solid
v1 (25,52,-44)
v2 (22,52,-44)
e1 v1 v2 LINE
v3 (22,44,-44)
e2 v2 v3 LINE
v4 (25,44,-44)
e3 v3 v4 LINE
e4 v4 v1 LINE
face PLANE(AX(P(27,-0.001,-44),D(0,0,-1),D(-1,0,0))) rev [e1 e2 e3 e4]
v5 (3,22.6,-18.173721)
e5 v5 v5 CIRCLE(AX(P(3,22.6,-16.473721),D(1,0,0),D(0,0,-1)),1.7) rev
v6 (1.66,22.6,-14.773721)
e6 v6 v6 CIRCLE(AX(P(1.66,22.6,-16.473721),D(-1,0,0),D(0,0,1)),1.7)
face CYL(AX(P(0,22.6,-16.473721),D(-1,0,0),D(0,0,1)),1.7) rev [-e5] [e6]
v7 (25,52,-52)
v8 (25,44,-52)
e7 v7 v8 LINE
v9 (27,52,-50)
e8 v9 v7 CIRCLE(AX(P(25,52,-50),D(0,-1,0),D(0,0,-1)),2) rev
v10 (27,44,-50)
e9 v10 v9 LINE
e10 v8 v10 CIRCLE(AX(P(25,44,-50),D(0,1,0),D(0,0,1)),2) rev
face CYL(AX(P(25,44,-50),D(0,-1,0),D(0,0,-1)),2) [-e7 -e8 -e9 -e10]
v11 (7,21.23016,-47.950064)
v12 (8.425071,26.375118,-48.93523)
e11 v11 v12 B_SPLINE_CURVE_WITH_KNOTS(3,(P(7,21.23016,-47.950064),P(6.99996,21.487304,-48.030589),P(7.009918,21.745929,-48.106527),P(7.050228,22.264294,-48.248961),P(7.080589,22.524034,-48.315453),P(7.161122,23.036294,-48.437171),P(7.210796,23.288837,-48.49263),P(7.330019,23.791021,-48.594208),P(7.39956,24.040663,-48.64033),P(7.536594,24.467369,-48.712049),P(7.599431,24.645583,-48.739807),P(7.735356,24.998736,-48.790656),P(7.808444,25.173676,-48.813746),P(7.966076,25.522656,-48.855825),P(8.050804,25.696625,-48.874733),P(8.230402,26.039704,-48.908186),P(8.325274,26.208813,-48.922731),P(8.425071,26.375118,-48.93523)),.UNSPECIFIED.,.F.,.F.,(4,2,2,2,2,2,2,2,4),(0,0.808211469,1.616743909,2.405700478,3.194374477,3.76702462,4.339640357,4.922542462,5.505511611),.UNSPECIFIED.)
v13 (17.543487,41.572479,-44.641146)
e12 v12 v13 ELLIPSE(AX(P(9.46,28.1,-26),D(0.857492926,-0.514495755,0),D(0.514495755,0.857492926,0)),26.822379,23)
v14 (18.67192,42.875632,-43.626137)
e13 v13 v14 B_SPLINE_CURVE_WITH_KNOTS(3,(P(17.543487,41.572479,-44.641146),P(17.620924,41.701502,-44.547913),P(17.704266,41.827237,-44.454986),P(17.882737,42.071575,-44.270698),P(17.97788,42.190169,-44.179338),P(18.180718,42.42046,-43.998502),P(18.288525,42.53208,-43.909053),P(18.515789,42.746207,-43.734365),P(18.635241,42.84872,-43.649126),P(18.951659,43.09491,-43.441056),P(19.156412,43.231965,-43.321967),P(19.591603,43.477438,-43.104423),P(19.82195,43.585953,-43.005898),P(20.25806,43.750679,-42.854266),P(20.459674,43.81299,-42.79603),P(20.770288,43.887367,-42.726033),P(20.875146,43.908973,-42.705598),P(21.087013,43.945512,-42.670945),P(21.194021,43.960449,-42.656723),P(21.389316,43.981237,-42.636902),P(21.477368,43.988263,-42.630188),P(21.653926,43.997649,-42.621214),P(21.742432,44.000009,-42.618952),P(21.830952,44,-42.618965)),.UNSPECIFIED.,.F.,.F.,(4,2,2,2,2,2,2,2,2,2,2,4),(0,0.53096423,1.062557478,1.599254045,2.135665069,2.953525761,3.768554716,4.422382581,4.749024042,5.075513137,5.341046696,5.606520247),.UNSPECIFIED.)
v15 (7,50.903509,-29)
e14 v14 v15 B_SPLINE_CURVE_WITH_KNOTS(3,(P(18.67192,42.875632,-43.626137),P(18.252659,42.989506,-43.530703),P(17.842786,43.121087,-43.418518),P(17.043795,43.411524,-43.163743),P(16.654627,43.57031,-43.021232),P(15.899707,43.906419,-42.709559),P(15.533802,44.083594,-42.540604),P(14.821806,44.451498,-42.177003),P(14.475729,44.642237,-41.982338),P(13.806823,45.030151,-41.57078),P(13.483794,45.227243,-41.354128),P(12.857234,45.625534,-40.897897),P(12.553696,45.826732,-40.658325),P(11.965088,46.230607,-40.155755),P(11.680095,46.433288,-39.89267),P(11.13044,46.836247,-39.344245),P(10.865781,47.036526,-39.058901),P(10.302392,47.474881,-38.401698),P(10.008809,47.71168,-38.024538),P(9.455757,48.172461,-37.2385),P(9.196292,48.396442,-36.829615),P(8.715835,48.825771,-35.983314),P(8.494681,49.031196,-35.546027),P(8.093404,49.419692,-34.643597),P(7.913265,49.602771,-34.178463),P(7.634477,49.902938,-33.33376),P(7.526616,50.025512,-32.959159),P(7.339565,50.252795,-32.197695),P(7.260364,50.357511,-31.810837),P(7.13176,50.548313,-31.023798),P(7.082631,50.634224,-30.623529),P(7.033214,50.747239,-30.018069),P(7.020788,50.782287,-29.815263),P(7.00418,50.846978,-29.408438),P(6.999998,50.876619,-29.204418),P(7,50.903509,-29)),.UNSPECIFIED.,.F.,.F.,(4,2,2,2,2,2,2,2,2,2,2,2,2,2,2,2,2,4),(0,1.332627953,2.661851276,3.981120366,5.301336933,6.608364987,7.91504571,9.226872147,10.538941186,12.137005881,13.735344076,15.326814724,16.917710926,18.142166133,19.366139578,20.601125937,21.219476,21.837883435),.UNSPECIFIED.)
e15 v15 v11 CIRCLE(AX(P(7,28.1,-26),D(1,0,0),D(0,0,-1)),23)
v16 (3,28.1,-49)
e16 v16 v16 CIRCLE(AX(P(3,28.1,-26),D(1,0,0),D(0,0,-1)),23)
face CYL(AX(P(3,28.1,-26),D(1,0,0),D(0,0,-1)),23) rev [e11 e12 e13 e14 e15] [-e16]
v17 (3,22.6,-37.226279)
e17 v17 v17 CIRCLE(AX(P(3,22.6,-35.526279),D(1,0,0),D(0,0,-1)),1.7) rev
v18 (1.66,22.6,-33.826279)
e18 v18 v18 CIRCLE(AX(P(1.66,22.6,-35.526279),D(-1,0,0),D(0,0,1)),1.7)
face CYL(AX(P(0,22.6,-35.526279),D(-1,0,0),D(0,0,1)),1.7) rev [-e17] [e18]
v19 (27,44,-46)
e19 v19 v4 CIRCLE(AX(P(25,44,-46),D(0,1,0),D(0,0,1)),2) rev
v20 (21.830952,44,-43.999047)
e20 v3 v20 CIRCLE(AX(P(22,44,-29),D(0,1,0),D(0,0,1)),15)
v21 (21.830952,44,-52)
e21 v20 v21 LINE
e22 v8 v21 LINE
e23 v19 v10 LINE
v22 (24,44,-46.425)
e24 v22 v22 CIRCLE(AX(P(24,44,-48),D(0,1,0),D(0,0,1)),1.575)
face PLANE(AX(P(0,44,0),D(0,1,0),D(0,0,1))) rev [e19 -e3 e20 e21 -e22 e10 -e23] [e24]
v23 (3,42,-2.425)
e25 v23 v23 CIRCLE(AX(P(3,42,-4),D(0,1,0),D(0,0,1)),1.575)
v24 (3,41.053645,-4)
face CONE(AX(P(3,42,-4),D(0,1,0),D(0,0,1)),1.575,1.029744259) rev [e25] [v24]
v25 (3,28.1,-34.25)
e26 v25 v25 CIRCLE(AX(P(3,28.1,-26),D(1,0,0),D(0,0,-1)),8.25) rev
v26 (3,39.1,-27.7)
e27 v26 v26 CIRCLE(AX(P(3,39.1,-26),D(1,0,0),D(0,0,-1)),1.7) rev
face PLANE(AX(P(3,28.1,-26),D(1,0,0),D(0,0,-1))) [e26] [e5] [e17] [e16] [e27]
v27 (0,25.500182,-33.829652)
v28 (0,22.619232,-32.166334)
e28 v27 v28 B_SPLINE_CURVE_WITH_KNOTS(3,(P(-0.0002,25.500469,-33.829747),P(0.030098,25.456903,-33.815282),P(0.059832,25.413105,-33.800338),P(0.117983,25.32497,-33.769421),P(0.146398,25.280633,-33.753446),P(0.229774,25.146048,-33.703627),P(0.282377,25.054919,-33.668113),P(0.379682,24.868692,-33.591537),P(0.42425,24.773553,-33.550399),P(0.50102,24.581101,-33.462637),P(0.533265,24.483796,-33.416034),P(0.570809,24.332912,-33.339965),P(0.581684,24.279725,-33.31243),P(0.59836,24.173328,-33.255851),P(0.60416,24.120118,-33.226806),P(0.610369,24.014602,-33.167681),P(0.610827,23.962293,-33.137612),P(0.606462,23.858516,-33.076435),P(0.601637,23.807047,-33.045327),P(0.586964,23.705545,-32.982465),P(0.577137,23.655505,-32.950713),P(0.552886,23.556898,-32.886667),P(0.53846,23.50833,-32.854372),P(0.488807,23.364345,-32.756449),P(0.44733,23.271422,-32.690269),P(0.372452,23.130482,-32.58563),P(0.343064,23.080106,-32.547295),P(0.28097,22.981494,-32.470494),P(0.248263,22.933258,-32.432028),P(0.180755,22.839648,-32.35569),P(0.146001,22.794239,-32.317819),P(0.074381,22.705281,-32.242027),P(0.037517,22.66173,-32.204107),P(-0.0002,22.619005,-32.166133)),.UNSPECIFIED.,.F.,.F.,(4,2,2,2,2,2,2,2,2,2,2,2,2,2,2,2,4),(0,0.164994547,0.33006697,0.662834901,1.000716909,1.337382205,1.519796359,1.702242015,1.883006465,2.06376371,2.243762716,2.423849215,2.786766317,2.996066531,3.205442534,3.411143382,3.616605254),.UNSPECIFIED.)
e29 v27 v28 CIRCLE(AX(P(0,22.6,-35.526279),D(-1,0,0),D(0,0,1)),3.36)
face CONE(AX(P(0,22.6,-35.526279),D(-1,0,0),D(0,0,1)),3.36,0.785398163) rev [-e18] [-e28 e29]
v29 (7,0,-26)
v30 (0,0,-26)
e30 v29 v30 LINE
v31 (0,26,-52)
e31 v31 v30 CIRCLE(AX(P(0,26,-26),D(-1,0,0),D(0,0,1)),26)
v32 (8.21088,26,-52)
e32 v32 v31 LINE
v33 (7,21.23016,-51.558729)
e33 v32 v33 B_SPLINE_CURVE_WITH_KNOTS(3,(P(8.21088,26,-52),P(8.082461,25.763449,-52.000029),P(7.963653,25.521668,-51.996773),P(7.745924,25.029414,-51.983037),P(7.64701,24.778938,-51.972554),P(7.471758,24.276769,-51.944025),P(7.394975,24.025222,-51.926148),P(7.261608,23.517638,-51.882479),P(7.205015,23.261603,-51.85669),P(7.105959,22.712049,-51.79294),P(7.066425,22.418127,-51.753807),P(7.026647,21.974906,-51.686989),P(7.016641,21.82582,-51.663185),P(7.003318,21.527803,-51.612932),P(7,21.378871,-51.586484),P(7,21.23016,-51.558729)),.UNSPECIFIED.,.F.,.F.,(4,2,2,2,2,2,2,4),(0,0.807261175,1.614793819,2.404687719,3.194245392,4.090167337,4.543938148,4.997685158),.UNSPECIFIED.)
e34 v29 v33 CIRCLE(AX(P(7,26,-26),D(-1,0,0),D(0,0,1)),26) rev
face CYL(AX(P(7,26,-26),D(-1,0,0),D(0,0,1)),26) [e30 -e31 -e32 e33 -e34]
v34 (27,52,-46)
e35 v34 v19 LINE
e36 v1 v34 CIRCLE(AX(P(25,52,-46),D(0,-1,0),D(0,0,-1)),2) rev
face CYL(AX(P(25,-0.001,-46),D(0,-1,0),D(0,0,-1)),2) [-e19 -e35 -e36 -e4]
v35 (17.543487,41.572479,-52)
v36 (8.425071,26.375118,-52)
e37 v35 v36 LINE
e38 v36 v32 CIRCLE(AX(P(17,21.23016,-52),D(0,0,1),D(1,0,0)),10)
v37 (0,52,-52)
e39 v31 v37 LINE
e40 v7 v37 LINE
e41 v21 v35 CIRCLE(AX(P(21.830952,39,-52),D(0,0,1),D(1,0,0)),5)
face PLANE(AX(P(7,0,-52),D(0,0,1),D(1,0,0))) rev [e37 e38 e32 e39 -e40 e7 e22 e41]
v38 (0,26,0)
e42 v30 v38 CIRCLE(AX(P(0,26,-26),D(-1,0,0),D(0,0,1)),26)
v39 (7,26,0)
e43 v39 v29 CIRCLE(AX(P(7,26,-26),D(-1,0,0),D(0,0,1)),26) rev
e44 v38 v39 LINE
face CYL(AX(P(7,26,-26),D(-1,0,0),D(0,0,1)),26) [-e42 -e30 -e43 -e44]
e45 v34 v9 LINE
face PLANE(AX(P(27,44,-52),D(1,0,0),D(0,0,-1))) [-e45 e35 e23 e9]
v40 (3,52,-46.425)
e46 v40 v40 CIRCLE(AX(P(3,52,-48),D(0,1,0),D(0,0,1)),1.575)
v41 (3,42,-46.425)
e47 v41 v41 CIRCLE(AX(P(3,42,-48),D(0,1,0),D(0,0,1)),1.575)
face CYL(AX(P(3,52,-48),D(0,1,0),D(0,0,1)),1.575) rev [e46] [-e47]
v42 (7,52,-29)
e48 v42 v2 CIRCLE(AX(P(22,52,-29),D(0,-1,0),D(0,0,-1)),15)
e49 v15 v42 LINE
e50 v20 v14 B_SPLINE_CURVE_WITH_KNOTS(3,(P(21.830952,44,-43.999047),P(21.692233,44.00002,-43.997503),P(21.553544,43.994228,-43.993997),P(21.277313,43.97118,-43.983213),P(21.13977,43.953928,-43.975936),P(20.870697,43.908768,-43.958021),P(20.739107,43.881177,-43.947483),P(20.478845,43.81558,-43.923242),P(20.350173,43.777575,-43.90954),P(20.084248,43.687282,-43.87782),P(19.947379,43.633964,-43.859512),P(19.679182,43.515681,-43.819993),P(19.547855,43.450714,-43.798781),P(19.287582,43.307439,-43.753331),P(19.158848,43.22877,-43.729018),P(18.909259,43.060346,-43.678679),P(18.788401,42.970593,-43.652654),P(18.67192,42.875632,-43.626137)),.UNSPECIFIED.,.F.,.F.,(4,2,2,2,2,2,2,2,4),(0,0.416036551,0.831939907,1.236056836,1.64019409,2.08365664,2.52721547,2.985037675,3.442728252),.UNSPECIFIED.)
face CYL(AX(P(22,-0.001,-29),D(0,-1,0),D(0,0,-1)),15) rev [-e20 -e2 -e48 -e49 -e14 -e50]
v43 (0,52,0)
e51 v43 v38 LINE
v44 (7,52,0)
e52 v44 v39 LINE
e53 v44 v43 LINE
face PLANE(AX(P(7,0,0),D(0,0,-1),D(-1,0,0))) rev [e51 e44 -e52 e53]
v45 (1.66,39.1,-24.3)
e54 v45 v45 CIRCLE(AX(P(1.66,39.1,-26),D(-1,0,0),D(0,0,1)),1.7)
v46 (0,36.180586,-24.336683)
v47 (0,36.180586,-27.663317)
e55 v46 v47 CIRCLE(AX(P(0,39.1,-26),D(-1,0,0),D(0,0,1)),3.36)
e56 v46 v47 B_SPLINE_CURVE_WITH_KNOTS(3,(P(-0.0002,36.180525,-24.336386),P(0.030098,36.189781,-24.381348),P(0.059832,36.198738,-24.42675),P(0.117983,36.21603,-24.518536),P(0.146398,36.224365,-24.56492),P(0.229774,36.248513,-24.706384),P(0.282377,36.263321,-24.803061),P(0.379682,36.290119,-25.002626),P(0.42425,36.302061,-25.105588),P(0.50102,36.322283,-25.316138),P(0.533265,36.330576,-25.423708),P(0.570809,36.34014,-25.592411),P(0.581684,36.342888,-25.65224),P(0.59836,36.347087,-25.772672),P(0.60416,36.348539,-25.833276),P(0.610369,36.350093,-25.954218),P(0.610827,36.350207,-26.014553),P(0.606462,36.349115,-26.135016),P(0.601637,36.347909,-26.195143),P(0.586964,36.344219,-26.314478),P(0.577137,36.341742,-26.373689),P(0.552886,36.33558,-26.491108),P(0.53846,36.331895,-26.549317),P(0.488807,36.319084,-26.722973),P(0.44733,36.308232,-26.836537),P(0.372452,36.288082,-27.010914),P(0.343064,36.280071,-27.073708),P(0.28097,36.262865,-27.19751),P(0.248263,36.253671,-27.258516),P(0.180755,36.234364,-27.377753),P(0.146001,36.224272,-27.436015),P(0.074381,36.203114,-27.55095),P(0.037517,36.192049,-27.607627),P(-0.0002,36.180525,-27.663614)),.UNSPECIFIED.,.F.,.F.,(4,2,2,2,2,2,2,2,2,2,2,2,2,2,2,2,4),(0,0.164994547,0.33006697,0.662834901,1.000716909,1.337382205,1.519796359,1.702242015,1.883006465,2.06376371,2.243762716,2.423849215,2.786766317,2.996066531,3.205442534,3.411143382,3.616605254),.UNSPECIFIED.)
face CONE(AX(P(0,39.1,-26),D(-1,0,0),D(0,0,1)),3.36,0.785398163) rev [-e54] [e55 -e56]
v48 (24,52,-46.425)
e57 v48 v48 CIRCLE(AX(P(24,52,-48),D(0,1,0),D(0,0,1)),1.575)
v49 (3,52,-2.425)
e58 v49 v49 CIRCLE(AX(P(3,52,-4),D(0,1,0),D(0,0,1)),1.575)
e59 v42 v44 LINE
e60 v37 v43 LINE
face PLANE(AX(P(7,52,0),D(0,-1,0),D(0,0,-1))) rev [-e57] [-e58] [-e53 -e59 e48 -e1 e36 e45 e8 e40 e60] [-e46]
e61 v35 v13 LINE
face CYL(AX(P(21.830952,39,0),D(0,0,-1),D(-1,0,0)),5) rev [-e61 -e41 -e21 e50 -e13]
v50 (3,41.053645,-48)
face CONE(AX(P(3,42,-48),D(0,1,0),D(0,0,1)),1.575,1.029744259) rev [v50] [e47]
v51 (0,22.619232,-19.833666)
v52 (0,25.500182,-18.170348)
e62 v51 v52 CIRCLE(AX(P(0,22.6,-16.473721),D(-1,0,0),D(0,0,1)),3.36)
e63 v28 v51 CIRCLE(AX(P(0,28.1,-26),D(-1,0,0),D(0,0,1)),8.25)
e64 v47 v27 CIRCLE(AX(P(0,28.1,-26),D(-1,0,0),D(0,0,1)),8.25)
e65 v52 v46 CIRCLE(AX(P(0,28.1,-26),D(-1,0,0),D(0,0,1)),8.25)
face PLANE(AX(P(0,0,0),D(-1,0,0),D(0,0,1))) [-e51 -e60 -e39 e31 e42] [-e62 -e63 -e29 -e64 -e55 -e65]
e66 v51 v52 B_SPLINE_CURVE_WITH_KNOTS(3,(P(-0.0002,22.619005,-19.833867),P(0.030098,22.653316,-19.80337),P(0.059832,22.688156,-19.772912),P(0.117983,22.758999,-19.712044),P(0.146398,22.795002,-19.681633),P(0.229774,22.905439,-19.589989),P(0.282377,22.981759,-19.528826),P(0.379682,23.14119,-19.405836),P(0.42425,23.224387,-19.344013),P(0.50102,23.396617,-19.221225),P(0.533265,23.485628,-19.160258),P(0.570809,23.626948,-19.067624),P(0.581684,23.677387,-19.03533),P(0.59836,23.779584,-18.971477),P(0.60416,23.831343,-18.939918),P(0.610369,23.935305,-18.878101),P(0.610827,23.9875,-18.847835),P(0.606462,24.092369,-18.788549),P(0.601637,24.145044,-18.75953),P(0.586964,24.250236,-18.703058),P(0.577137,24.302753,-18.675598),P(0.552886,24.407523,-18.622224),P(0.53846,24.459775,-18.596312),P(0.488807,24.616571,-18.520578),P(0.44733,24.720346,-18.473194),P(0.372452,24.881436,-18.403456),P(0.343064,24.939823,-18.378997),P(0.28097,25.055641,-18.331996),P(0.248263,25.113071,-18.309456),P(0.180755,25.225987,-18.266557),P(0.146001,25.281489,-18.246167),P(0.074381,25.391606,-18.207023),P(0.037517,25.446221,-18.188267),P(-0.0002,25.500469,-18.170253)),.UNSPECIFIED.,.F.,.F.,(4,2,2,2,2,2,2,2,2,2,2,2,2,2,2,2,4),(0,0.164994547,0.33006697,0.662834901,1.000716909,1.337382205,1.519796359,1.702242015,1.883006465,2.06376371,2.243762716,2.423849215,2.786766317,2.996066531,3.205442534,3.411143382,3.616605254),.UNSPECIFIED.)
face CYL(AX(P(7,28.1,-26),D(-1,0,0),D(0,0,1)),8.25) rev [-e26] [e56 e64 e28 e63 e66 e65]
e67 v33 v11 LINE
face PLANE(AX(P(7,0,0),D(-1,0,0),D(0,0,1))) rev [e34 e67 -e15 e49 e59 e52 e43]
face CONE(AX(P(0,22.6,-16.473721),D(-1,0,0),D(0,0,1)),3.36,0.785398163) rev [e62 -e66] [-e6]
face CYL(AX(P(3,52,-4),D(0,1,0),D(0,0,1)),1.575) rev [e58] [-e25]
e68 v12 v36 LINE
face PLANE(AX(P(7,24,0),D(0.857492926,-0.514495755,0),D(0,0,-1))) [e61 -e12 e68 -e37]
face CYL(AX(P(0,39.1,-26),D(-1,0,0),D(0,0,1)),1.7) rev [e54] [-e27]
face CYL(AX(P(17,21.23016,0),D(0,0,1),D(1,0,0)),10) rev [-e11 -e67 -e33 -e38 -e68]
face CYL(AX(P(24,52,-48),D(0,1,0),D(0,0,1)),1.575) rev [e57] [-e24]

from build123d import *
from OCP.BRepFilletAPI import BRepFilletAPI_MakeChamfer

# Parameters (mm, degrees)
ESBO_O1_W                                      = 52
ESBO_O1_H                                      = 52
RESSALTO_EXTRUS_O1_DEPTH                       = 7
ESBO_O2_R                                      = 8.25
CORTE_EXTRUS_O1_DEPTH                          = 74.87151007
ESCAREADO_PARA_SFHCS_M31_D                     = 3.4
ESCAREADO_PARA_SFHCS_M31_CSINK_D               = 6.72
ESCAREADO_PARA_SFHCS_M31_CSINK_ANGLE           = 90
PADR_OCIRCULAR1_COUNT                          = 3
ESBO_O27_R                                     = 23
CORTE_EXTRUS_O5_DEPTH                          = 4
FILETE1_R                                      = 26
FURO_ROSCADO_PARA_CONDU_TE_DE_M3X0_51_AT_COUNT = 2
FURO_ROSCADO_PARA_CONDU_TE_DE_M3X0_51_AT_PITCH = 44
ESBO_O35_W                                     = 20
ESBO_O35_H                                     = 52
RESSALTO_EXTRUS_O2_DEPTH                       = 8
ESBO_O37_R                                     = 23
CORTE_EXTRUS_O6_DEPTH                          = 77.210235533
CHANFRO1_SIZE                                  = 12
CHANFRO1_SIZE2                                 = 20
FILETE2_R                                      = 10
FILETE3_R                                      = 5
CORTE_EXTRUS_O7_REACH                          = 80.339
ESBO_O39_W                                     = 20
ESBO_O39_H                                     = 36
FILETE5_R                                      = 15
FILETE6_R                                      = 2
CORTE_EXTRUS_O8_REACH                          = 80.339
ESBO_O40_W                                     = 32.243724172
ESBO_O40_H                                     = 53.230333596


with BuildPart() as part:
    # Esboço1 → Ressalto-extrusão1 (new body)
    with BuildSketch(Plane(origin=(0, 0, 0), x_dir=(0, 0, -1), z_dir=(1, 0, 0))):
        with Locations((26, 26)):
            Rectangle(ESBO_O1_W, ESBO_O1_H)
    extrude(amount=RESSALTO_EXTRUS_O1_DEPTH)

    # Esboço2 → Corte-extrusão1 (cut, through all)
    with BuildSketch(Plane.ZY):
        with Locations((-26, 28.1)):
            Circle(ESBO_O2_R)
    extrude(amount=-CORTE_EXTRUS_O1_DEPTH, mode=Mode.SUBTRACT)

    # Escareado para SFHCS M31 (through all)
    with Locations(Plane.ZY):
        with Locations((-26, 39.1)):
            escareado_para_sfhcs_m31 = CounterSinkHole(ESCAREADO_PARA_SFHCS_M31_D / 2, ESCAREADO_PARA_SFHCS_M31_CSINK_D / 2, counter_sink_angle=ESCAREADO_PARA_SFHCS_M31_CSINK_ANGLE)

    # PadrãoCircular1: Escareado para SFHCS M31 ×3 about axis
    padr_ocircular1_axis = Axis((0, 28.1, -26), (1, 0, 0))
    for i in range(1, PADR_OCIRCULAR1_COUNT):
        add(escareado_para_sfhcs_m31.rotate(padr_ocircular1_axis, i * 360 / PADR_OCIRCULAR1_COUNT), mode=Mode.SUBTRACT)

    # Esboço27 → Corte-extrusão5 (cut)
    with BuildSketch(Plane(origin=(7, 0, 0), x_dir=(0, 0, -1), z_dir=(1, 0, 0))):
        with Locations((26, 28.1)):
            Circle(ESBO_O27_R)
    extrude(amount=-CORTE_EXTRUS_O5_DEPTH, mode=Mode.SUBTRACT)

    # Filete1
    filete1_edges = [part.edges().sort_by_distance(p)[0] for p in [
        (3.5, 0, -52),
        (3.5, 0, 0),
    ]]
    fillet(filete1_edges, radius=FILETE1_R - 0.0001)  # a hair under: the kernel refuses the full size

    # Esboço34 → Furo roscado para conduíte de M3x0.51 (revolve, cut)
    with BuildSketch(Plane(origin=(3, 52, -48), x_dir=(0, 0, 1), z_dir=(1, 0, 0))):
        Polygon((0, 0), (0, 10.946355475), (1.575, 10), (1.575, 0), align=None)
    furo_roscado_para_condu_te_de_m3x0_51 = revolve(axis=Axis((3, 58.35, -48), (0, -1, 0)), mode=Mode.SUBTRACT)

    # Furo roscado para conduíte de M3x0.51 at: Furo roscado para conduíte de M3x0.51 ×2
    with Locations(*[(0, 0, i * FURO_ROSCADO_PARA_CONDU_TE_DE_M3X0_51_AT_PITCH) for i in range(1, FURO_ROSCADO_PARA_CONDU_TE_DE_M3X0_51_AT_COUNT)]):
        add(furo_roscado_para_condu_te_de_m3x0_51, mode=Mode.SUBTRACT)

    # Esboço35 → Ressalto-extrusão2 (add)
    with BuildSketch(Plane(origin=(0, 52, 0), x_dir=(1, 0, 0), z_dir=(0, 1, 0))):
        with Locations((17, 26)):
            Rectangle(ESBO_O35_W, ESBO_O35_H)
    extrude(amount=-RESSALTO_EXTRUS_O2_DEPTH)

    # Esboço37 → Corte-extrusão6 (cut, through all)
    with BuildSketch(Plane(origin=(7, 0, 0), x_dir=(0, 0, -1), z_dir=(1, 0, 0))):
        with Locations((26, 28.1)):
            Circle(ESBO_O37_R)
    extrude(amount=CORTE_EXTRUS_O6_DEPTH, mode=Mode.SUBTRACT)

    # Chanfro1: one chamfer whose edges measure the first distance from different faces: ONE call of the kernel's chamfer builder (chamfer() names one face for all edges)
    chanfro1_edges_1 = [part.edges().sort_by_distance(p)[0] for p in [
        (7, 44, -47.309482535),
    ]]
    chanfro1_side_1 = [part.faces().sort_by_distance(p)[0] for p in [
        (17, 44, -47.309482535),
    ]]
    chanfro1_edges_2 = [part.edges().sort_by_distance(p)[0] for p in [
        (7, 44, -4.690517465),
    ]]
    chanfro1_side_2 = [part.faces().sort_by_distance(p)[0] for p in [
        (17, 44, -4.690517465),
    ]]
    chanfro1 = BRepFilletAPI_MakeChamfer(part.part.solid().wrapped)
    for e in chanfro1_edges_1:
        chanfro1.Add(CHANFRO1_SIZE, CHANFRO1_SIZE2, e.wrapped, chanfro1_side_1[0].wrapped)  # the first distance lies on this face
    for e in chanfro1_edges_2:
        chanfro1.Add(CHANFRO1_SIZE, CHANFRO1_SIZE2, e.wrapped, chanfro1_side_2[0].wrapped)  # the first distance lies on this face
    add(Compound.cast(chanfro1.Shape()), mode=Mode.REPLACE)

    # Filete2
    filete2_edges = [part.edges().sort_by_distance(p)[0] for p in [
        (7, 24, -1.722707367),
        (7, 24, -50.277292633),
    ]]
    fillet(filete2_edges, radius=FILETE2_R)

    # Filete3
    filete3_edges = [part.edges().sort_by_distance(p)[0] for p in [
        (19, 44, -4.690517465),
        (19, 44, -47.309482535),
    ]]
    fillet(filete3_edges, radius=FILETE3_R)

    # Espelhar1: Furo roscado para conduíte de M3x0.51 across plane
    add(furo_roscado_para_condu_te_de_m3x0_51.mirror(Plane.ZY.offset(-13.5)), mode=Mode.SUBTRACT)

    # Espelhar1 copy 1 sketch → Espelhar1 copy 1 (revolve, cut)
    with BuildSketch(Plane(origin=(24, 52, -4), x_dir=(0, 0, 1), z_dir=(-1, 0, 0))):
        Polygon((0, 0), (0, -10.946355475), (1.575, -10), (1.575, 0), align=None)
    revolve(axis=Axis((24, 58.35, -4), (0, 1, 0)), mode=Mode.SUBTRACT)

    # Esboço39 → Corte-extrusão7 (cut, up to next)
    with BuildSketch(Plane(origin=(0, 52, 0), x_dir=(1, 0, 0), z_dir=(0, 1, 0)), mode=Mode.PRIVATE) as corte_extrus_o7_sk1:
        with Locations((17, 26)):
            Rectangle(ESBO_O39_W, ESBO_O39_H)
    corte_extrus_o7_tool1 = extrude(corte_extrus_o7_sk1.sketch, amount=-CORTE_EXTRUS_O7_REACH, mode=Mode.PRIVATE) & part.part
    add(corte_extrus_o7_tool1.solids().sort_by_distance((17, 52, -26))[0], mode=Mode.SUBTRACT)

    # Filete5
    filete5_edges = [part.edges().sort_by_distance(p)[0] for p in [
        (7, 47.208910532, -44),
        (7, 47.208910532, -8),
    ]]
    fillet(filete5_edges, radius=FILETE5_R)

    # Filete6
    filete6_edges = [part.edges().sort_by_distance(p)[0] for p in [
        (27, 48, -44),
        (27, 48, -8),
        (27, 48, -52),
        (27, 48, 0),
    ]]
    fillet(filete6_edges, radius=FILETE6_R)

    # Esboço40 → Corte-extrusão8 (cut, up to next)
    with BuildSketch(Plane.XY, mode=Mode.PRIVATE) as corte_extrus_o8_sk1:
        with Locations((23.121862086, 26.615166798)):
            Rectangle(ESBO_O40_W, ESBO_O40_H)
    corte_extrus_o8_tool1 = extrude(corte_extrus_o8_sk1.sketch, amount=-CORTE_EXTRUS_O8_REACH, mode=Mode.PRIVATE) & part.part
    add(corte_extrus_o8_tool1.solids().sort_by_distance((23.121862, 26.615167, 0))[0], mode=Mode.SUBTRACT)


solid = part.part
